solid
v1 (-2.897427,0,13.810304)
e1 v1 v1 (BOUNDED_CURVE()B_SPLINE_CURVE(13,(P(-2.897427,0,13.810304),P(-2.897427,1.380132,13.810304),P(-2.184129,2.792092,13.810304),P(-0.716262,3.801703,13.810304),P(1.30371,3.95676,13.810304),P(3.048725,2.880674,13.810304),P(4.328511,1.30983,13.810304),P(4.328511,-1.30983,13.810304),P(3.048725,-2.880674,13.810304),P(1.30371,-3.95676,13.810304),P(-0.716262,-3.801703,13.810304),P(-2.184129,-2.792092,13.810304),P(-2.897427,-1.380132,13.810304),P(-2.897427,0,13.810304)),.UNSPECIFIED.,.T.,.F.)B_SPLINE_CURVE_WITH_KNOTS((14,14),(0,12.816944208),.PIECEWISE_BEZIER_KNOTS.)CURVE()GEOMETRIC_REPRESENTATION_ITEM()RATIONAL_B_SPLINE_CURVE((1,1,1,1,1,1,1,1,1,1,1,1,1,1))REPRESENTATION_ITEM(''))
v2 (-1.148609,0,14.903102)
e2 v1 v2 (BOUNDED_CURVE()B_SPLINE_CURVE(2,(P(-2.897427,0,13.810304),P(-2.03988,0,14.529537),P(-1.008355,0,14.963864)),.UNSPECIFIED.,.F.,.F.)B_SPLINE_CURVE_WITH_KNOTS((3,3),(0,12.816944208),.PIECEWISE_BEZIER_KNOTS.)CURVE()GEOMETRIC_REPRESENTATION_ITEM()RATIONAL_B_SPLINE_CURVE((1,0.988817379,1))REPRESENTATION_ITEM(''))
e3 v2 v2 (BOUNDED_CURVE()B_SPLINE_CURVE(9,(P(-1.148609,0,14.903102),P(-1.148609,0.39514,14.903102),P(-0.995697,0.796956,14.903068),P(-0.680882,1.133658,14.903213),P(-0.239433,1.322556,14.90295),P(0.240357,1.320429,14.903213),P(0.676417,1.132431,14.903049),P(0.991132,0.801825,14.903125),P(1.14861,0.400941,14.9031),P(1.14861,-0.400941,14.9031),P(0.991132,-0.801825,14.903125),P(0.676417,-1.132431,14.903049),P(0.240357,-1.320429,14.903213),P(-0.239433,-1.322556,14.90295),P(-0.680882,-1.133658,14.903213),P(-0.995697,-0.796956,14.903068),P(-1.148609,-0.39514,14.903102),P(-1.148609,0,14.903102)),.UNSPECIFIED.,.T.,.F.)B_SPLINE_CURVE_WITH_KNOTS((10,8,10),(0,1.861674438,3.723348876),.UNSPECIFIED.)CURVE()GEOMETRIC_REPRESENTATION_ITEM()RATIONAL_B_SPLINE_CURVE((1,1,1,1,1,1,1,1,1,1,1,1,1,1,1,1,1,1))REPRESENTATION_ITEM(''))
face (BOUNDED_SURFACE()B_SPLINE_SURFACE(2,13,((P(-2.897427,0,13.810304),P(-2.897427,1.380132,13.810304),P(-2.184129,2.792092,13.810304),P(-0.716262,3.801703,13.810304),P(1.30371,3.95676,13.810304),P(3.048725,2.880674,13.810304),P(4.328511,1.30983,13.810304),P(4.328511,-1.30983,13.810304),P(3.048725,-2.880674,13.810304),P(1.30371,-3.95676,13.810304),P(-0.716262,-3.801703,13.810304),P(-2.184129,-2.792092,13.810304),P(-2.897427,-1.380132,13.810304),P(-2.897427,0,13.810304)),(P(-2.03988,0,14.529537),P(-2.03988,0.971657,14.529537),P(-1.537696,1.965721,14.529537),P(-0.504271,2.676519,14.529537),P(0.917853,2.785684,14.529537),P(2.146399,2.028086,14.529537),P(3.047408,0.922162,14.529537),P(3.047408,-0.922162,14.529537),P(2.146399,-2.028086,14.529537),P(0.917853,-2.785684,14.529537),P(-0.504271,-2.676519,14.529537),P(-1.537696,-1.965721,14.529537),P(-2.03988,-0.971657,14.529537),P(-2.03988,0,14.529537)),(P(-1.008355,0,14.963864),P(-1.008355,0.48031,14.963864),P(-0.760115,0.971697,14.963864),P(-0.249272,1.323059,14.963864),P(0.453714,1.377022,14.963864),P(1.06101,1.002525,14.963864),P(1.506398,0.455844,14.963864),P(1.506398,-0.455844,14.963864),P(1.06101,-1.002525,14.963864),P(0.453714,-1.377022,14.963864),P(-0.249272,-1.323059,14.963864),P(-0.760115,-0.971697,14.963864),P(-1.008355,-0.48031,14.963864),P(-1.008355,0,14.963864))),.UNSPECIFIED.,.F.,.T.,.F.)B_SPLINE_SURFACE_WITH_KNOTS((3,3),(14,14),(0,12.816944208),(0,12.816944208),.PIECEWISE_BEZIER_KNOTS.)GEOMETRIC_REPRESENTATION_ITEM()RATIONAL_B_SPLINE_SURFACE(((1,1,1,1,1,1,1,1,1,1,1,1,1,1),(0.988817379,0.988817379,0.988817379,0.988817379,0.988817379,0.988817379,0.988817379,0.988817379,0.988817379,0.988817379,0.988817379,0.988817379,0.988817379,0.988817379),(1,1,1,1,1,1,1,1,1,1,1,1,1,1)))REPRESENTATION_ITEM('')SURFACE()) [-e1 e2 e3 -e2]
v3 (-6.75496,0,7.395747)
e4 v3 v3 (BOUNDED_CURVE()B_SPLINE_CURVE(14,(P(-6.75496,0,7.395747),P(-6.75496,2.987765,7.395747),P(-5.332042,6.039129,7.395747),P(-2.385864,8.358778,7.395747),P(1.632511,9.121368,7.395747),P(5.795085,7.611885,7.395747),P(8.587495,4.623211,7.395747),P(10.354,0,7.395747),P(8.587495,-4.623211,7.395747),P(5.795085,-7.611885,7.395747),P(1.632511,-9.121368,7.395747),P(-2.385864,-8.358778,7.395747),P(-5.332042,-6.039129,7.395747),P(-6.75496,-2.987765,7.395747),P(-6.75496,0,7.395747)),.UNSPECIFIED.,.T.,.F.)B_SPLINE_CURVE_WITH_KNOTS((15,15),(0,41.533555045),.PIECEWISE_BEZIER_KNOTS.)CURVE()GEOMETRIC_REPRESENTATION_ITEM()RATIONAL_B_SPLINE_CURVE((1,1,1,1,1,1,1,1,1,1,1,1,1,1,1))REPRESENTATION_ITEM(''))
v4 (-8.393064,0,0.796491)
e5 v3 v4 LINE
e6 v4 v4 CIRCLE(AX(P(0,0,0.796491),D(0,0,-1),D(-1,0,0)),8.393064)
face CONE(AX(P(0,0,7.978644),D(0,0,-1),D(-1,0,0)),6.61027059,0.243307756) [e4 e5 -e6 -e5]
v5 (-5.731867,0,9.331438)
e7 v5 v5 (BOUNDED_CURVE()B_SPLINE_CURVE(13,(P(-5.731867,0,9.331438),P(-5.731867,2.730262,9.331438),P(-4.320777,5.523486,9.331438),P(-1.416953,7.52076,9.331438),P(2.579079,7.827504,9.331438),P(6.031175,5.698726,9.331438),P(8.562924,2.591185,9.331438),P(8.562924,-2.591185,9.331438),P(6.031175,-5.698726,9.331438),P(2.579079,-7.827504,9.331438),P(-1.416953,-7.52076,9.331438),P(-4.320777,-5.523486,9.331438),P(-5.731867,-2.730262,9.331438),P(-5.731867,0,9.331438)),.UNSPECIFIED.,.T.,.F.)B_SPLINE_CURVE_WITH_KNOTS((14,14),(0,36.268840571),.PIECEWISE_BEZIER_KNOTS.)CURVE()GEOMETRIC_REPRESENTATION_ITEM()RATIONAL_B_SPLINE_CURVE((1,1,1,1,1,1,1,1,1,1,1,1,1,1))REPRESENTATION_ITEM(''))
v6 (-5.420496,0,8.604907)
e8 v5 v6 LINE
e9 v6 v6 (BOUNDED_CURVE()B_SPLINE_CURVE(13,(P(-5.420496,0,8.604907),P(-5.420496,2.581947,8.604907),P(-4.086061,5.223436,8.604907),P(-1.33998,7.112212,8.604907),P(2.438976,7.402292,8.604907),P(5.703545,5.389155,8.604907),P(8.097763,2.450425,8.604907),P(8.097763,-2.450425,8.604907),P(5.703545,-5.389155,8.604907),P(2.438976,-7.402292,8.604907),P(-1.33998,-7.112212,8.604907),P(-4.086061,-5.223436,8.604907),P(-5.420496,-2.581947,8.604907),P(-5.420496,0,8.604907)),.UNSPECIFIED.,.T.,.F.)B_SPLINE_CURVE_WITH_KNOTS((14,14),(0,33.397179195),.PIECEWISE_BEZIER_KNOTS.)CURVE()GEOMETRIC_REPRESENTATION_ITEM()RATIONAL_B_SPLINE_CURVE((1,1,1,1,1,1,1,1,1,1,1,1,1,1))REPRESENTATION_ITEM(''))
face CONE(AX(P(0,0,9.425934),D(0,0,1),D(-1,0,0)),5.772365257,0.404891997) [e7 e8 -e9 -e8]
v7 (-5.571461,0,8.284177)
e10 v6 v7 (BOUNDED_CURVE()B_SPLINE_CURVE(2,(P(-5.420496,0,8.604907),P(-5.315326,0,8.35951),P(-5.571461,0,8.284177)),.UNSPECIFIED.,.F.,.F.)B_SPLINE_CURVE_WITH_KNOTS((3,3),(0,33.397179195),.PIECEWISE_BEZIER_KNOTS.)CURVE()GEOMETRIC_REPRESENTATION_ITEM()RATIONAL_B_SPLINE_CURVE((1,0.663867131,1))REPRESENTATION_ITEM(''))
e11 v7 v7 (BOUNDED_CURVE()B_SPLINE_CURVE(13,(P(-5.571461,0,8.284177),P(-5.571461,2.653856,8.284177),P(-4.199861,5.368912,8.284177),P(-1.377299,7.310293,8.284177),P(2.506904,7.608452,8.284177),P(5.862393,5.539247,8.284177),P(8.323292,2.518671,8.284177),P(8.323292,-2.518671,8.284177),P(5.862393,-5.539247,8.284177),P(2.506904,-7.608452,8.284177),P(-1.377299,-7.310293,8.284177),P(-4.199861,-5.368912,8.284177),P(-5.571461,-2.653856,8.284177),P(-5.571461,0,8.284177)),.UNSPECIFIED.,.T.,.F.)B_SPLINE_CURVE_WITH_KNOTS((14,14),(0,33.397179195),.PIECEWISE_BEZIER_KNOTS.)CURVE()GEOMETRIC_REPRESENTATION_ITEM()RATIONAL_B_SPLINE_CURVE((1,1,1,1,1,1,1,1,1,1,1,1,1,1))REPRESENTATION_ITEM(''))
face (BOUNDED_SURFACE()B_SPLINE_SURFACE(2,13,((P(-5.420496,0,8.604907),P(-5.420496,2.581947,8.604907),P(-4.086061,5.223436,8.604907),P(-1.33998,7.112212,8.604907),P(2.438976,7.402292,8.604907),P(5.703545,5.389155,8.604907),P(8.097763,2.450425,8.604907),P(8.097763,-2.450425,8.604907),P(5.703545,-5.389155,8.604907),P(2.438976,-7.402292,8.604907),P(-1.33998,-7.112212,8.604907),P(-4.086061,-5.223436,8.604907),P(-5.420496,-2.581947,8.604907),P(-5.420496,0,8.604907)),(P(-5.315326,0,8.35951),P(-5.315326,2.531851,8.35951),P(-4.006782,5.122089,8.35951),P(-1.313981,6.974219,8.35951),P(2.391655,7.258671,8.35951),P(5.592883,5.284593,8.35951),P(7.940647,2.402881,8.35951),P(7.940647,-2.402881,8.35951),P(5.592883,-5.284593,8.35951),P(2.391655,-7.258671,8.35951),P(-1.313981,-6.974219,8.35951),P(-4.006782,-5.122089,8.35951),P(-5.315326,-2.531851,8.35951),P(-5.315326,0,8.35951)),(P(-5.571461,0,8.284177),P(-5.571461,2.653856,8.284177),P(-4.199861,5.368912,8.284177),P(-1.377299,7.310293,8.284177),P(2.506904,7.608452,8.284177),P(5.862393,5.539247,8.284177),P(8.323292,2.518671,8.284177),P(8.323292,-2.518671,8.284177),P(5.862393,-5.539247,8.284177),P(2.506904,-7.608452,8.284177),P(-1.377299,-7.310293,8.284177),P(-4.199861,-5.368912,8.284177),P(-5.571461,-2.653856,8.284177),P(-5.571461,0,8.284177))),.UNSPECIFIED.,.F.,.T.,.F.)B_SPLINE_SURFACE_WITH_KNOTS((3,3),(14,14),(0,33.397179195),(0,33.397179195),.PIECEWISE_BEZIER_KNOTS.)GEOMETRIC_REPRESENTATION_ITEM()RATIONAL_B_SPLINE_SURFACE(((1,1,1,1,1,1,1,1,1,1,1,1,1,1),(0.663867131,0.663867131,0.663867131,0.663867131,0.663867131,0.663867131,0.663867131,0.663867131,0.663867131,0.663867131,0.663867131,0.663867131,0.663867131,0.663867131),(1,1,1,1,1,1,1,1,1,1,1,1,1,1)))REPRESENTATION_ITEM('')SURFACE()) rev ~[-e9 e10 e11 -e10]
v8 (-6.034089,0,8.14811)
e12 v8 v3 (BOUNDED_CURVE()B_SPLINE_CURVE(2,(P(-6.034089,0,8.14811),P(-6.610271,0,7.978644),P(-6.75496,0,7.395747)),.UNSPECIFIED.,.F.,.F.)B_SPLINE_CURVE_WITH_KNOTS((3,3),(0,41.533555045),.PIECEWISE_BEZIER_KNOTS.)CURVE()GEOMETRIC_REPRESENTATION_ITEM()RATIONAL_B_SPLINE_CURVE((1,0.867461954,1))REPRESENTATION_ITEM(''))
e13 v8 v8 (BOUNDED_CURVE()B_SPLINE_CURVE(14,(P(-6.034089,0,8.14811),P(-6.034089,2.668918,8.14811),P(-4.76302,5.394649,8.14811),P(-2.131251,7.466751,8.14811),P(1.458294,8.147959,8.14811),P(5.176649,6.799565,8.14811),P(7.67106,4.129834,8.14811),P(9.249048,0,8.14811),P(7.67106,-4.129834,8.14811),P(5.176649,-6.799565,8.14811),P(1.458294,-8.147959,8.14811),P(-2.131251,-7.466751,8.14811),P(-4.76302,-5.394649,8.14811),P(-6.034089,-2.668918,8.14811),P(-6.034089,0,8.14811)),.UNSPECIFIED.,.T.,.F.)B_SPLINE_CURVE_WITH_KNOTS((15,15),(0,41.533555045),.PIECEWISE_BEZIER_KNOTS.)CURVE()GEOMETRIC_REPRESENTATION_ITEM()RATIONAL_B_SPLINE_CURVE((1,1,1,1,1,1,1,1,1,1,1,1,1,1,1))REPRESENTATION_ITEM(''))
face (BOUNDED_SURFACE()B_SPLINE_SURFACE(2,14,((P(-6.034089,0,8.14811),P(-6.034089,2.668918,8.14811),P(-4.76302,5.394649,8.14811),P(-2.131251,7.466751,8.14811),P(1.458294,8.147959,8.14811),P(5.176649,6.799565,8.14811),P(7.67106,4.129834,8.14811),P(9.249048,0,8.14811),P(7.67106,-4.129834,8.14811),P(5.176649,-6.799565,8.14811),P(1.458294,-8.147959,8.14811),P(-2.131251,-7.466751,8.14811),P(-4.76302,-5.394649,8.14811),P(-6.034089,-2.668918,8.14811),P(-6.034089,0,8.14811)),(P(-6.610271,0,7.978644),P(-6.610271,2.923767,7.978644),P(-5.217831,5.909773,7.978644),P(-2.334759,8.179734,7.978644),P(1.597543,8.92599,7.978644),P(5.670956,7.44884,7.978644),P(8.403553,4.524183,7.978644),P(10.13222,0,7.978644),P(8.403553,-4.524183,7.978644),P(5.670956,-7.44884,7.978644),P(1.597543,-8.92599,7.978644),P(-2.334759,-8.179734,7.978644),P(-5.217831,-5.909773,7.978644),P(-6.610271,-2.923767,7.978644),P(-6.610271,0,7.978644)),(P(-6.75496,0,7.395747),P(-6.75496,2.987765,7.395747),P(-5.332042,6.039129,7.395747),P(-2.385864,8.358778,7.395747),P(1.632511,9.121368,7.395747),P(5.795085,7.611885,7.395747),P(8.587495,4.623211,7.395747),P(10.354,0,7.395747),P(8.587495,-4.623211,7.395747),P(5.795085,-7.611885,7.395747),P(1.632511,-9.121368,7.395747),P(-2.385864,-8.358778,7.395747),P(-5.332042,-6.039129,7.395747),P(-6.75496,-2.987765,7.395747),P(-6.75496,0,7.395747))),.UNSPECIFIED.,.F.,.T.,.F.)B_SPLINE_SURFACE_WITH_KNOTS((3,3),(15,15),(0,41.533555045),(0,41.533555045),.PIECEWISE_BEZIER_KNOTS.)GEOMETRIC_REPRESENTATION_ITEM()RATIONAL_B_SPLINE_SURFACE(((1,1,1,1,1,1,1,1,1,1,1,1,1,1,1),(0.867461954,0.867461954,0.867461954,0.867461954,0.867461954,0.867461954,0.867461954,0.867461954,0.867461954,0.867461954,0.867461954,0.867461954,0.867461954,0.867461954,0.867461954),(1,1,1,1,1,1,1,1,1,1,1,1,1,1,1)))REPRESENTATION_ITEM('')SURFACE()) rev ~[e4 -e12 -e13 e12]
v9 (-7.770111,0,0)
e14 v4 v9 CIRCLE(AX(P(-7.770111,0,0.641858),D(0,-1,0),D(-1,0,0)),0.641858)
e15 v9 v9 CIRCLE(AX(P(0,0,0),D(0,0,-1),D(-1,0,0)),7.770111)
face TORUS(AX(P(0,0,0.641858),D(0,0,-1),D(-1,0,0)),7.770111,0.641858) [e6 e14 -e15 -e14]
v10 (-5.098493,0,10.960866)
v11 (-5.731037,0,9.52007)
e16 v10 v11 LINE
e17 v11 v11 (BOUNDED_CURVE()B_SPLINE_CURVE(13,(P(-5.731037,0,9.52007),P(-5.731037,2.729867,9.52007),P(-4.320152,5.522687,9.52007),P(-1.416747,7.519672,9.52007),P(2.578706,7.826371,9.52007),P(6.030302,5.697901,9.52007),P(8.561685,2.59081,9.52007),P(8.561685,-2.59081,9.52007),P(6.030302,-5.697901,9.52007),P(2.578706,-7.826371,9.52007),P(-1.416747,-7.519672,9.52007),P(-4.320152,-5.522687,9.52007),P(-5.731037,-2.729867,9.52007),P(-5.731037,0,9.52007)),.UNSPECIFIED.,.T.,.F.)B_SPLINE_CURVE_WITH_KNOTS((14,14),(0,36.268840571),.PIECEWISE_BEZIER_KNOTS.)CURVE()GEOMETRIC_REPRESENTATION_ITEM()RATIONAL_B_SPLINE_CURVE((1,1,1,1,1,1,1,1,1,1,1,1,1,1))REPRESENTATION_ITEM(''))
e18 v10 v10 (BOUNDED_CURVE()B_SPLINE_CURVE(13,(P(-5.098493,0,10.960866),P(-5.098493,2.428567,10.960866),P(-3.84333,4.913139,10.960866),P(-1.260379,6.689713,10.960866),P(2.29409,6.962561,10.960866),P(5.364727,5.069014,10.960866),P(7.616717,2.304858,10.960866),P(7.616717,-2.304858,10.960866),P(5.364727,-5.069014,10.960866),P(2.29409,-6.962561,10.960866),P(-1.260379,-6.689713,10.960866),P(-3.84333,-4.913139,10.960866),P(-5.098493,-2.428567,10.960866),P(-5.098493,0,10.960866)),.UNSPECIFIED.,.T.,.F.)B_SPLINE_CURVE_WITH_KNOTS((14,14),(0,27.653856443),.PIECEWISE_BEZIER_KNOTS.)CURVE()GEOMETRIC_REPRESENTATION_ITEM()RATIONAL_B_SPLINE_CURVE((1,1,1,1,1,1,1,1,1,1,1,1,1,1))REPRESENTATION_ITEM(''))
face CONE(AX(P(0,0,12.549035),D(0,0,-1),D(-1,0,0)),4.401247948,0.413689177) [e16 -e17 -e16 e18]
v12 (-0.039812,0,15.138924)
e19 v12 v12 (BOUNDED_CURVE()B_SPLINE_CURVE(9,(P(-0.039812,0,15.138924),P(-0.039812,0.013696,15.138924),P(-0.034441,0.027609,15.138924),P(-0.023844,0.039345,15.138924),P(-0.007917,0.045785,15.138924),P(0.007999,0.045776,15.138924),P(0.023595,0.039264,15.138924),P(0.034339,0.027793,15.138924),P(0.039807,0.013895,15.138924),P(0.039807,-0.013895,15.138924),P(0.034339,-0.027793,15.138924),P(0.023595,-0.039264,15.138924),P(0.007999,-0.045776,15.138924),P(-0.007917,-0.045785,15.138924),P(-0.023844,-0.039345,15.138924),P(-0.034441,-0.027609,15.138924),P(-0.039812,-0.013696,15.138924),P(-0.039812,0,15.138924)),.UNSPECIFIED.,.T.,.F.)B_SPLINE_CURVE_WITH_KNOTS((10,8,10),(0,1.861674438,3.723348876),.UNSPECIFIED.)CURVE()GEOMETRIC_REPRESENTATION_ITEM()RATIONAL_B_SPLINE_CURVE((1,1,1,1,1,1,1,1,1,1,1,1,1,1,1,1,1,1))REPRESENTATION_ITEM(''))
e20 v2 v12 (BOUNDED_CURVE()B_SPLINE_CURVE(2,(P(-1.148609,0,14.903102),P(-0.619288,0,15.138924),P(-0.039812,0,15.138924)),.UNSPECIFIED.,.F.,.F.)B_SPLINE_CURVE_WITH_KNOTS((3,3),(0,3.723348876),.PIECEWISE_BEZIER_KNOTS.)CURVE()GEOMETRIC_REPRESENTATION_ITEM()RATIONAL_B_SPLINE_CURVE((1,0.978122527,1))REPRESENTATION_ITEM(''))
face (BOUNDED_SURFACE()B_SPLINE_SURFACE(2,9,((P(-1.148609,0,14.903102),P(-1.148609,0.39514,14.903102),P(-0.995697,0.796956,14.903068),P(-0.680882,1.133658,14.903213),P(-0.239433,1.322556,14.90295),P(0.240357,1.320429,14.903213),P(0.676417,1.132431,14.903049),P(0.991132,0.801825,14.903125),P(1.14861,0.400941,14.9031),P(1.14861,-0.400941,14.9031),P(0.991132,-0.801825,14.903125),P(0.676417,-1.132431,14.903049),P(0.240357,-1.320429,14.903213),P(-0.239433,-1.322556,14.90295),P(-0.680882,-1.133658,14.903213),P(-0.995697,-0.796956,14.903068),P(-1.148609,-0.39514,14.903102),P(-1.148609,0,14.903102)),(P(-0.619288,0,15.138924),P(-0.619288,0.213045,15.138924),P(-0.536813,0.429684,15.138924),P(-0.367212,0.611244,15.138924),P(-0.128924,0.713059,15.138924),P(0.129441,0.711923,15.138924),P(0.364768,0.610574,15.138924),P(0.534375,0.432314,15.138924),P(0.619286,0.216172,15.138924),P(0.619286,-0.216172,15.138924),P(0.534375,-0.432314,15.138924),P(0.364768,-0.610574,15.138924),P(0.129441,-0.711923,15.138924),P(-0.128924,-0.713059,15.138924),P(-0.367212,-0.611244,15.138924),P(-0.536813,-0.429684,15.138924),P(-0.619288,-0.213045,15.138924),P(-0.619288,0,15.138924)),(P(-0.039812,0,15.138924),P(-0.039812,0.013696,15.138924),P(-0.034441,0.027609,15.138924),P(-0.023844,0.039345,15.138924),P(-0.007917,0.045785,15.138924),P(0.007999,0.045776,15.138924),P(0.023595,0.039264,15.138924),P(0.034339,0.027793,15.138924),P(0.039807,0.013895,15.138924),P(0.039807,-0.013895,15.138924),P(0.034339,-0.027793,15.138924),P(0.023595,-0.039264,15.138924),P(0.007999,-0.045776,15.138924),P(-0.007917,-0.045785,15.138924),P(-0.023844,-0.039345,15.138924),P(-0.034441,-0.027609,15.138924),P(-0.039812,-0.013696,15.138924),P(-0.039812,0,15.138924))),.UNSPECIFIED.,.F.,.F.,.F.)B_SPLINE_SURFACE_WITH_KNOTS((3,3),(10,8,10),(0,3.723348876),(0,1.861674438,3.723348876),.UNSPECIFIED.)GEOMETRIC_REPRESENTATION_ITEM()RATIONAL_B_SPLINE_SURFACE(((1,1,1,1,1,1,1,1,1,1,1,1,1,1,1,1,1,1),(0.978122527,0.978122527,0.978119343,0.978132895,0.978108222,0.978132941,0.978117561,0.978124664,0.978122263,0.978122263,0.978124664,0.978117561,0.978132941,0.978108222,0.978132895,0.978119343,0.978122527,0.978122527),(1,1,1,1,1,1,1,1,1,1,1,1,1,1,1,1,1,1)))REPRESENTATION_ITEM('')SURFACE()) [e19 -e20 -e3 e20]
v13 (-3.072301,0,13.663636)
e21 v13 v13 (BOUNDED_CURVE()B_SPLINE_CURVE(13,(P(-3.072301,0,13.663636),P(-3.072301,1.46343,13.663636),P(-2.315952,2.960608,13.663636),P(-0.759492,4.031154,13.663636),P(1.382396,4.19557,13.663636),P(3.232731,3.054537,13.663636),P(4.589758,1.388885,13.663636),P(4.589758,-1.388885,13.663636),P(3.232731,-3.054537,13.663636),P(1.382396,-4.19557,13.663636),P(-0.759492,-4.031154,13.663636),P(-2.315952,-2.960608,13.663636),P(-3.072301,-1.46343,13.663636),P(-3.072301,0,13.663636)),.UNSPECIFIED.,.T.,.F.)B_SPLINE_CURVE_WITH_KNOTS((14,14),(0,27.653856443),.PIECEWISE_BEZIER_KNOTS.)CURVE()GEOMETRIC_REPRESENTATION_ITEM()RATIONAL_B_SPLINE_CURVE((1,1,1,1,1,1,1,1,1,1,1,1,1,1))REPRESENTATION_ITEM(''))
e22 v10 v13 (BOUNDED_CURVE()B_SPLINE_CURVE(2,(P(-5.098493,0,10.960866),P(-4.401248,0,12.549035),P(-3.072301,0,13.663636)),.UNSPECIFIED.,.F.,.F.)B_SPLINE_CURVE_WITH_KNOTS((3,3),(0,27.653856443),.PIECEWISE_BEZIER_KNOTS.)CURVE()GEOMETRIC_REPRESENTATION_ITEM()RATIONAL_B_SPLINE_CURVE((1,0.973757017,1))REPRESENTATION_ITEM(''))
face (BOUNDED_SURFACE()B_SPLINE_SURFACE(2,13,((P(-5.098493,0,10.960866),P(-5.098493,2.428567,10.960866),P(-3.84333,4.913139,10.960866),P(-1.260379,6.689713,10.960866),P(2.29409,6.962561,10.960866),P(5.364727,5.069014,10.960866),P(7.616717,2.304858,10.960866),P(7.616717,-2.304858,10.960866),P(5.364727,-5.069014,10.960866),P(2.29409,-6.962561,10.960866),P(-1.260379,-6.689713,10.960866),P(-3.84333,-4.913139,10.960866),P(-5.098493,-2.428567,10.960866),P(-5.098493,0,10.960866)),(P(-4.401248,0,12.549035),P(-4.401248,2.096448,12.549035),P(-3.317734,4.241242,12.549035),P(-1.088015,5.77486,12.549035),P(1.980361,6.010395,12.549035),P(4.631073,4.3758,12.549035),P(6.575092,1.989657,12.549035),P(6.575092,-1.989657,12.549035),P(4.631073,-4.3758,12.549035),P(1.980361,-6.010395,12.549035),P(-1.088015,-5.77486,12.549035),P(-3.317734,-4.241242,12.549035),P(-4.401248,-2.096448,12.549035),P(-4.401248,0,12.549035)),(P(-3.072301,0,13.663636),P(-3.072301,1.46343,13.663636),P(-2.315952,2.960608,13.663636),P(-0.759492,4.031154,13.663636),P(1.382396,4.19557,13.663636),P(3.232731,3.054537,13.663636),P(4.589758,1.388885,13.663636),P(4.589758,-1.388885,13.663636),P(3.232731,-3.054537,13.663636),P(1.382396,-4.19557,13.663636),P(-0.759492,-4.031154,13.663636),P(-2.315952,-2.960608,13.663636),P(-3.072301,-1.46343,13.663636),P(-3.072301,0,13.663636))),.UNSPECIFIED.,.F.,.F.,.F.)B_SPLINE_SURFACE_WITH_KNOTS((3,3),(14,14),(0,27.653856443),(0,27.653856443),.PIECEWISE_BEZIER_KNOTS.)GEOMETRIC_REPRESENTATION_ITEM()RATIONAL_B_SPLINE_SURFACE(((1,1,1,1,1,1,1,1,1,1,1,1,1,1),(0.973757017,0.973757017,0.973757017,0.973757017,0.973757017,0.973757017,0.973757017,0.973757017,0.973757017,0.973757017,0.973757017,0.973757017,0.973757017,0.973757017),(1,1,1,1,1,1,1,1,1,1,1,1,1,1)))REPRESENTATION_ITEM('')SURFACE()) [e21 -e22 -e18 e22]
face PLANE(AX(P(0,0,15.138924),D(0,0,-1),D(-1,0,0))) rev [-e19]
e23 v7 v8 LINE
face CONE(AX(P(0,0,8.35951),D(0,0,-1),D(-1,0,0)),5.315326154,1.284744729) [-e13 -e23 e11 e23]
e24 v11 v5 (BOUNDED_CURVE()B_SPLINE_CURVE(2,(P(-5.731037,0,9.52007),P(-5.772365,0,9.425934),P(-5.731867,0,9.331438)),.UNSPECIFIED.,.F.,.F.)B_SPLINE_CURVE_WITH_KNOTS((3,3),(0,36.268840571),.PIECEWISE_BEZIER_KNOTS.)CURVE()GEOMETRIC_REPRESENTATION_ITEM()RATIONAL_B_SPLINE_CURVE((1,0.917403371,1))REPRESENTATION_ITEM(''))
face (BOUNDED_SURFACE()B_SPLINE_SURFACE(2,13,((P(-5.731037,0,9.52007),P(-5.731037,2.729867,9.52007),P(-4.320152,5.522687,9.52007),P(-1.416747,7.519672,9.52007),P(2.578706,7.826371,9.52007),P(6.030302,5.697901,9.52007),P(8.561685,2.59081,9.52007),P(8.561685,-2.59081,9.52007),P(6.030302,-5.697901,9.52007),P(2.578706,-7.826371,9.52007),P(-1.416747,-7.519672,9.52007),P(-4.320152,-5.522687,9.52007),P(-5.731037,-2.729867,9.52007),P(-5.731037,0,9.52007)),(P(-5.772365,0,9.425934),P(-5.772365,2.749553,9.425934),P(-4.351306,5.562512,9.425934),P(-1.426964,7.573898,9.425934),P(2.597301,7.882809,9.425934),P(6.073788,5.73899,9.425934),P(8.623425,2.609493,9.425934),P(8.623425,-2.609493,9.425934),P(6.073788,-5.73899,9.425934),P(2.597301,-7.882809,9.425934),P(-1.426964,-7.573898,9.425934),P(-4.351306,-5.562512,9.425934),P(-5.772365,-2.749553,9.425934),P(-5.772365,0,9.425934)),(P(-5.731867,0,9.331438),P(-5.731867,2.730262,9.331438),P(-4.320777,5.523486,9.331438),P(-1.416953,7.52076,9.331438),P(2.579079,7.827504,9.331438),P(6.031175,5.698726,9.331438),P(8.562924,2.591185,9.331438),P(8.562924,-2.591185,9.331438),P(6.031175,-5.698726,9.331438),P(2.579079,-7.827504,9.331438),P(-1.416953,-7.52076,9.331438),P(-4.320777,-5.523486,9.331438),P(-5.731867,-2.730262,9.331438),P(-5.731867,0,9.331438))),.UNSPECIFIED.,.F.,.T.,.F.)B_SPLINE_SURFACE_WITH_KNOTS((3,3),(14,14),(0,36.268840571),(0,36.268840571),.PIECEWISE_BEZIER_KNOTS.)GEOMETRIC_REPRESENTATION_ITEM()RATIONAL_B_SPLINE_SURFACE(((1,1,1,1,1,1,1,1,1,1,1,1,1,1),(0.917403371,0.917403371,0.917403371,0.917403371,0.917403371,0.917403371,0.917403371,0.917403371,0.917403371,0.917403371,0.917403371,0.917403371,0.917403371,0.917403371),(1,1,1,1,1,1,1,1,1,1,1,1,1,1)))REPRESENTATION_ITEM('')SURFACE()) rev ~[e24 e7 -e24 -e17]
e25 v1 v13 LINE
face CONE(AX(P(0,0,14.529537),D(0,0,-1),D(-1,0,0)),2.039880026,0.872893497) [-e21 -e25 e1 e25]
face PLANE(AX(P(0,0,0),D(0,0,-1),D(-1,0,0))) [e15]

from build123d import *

# Parameters (mm, degrees)
F2_R = 0.2370016828
F3_R = 1.0472005339
F4_R = 7.4210847051
F5_R = 2.7246047928
F6_R = 0.6418579552


with BuildPart() as f1:
    # F0 (on Front) → F1 (revolve)
    with BuildSketch(Plane.XZ):
        Polygon((-8.590772748, 0), (0, 0), (0, 15.1389241219), (-0.5925893784, 15.1389241219), (-2.0398800261, 14.5295374095), (-4.4012479484, 12.5490352511), (-5.7723652571, 9.4259344041), (-5.3153261542, 8.3595104516), (-6.6102705896, 7.978644222), align=None)
    revolve(axis=Axis((0, 0, 7.5694620609), (0, 0, -1)))

    # F2
    f2_edges = [f1.edges().sort_by_distance(p)[0] for p in [
        (5.772365, 0, 9.425934),
        (5.315326, 0, 8.35951),
        (-5.543846, 0, 8.892722),
    ]]
    fillet(f2_edges, radius=F2_R)

    # F3
    f3_edges = [f1.edges().sort_by_distance(p)[0] for p in [
        (6.610271, 0, 7.978644),
    ]]
    fillet(f3_edges, radius=F3_R)

    # F4
    f4_edges = [f1.edges().sort_by_distance(p)[0] for p in [
        (2.03988, 0, 14.529537),
        (4.401248, 0, 12.549035),
        (-3.220564, 0, 13.539286),
    ]]
    fillet(f4_edges, radius=F4_R)

    # F5
    f5_edges = [f1.edges().sort_by_distance(p)[0] for p in [
        (-0.800472, 0, 15.051394),
        (1.008351, 0, 14.963864),
        (0.592589, 0, 15.138924),
    ]]
    fillet(f5_edges, radius=F5_R)

    # F6
    f6_edges = [f1.edges().sort_by_distance(p)[0] for p in [
        (8.590773, 0, 0),
    ]]
    fillet(f6_edges, radius=F6_R)


solid = f1.part
